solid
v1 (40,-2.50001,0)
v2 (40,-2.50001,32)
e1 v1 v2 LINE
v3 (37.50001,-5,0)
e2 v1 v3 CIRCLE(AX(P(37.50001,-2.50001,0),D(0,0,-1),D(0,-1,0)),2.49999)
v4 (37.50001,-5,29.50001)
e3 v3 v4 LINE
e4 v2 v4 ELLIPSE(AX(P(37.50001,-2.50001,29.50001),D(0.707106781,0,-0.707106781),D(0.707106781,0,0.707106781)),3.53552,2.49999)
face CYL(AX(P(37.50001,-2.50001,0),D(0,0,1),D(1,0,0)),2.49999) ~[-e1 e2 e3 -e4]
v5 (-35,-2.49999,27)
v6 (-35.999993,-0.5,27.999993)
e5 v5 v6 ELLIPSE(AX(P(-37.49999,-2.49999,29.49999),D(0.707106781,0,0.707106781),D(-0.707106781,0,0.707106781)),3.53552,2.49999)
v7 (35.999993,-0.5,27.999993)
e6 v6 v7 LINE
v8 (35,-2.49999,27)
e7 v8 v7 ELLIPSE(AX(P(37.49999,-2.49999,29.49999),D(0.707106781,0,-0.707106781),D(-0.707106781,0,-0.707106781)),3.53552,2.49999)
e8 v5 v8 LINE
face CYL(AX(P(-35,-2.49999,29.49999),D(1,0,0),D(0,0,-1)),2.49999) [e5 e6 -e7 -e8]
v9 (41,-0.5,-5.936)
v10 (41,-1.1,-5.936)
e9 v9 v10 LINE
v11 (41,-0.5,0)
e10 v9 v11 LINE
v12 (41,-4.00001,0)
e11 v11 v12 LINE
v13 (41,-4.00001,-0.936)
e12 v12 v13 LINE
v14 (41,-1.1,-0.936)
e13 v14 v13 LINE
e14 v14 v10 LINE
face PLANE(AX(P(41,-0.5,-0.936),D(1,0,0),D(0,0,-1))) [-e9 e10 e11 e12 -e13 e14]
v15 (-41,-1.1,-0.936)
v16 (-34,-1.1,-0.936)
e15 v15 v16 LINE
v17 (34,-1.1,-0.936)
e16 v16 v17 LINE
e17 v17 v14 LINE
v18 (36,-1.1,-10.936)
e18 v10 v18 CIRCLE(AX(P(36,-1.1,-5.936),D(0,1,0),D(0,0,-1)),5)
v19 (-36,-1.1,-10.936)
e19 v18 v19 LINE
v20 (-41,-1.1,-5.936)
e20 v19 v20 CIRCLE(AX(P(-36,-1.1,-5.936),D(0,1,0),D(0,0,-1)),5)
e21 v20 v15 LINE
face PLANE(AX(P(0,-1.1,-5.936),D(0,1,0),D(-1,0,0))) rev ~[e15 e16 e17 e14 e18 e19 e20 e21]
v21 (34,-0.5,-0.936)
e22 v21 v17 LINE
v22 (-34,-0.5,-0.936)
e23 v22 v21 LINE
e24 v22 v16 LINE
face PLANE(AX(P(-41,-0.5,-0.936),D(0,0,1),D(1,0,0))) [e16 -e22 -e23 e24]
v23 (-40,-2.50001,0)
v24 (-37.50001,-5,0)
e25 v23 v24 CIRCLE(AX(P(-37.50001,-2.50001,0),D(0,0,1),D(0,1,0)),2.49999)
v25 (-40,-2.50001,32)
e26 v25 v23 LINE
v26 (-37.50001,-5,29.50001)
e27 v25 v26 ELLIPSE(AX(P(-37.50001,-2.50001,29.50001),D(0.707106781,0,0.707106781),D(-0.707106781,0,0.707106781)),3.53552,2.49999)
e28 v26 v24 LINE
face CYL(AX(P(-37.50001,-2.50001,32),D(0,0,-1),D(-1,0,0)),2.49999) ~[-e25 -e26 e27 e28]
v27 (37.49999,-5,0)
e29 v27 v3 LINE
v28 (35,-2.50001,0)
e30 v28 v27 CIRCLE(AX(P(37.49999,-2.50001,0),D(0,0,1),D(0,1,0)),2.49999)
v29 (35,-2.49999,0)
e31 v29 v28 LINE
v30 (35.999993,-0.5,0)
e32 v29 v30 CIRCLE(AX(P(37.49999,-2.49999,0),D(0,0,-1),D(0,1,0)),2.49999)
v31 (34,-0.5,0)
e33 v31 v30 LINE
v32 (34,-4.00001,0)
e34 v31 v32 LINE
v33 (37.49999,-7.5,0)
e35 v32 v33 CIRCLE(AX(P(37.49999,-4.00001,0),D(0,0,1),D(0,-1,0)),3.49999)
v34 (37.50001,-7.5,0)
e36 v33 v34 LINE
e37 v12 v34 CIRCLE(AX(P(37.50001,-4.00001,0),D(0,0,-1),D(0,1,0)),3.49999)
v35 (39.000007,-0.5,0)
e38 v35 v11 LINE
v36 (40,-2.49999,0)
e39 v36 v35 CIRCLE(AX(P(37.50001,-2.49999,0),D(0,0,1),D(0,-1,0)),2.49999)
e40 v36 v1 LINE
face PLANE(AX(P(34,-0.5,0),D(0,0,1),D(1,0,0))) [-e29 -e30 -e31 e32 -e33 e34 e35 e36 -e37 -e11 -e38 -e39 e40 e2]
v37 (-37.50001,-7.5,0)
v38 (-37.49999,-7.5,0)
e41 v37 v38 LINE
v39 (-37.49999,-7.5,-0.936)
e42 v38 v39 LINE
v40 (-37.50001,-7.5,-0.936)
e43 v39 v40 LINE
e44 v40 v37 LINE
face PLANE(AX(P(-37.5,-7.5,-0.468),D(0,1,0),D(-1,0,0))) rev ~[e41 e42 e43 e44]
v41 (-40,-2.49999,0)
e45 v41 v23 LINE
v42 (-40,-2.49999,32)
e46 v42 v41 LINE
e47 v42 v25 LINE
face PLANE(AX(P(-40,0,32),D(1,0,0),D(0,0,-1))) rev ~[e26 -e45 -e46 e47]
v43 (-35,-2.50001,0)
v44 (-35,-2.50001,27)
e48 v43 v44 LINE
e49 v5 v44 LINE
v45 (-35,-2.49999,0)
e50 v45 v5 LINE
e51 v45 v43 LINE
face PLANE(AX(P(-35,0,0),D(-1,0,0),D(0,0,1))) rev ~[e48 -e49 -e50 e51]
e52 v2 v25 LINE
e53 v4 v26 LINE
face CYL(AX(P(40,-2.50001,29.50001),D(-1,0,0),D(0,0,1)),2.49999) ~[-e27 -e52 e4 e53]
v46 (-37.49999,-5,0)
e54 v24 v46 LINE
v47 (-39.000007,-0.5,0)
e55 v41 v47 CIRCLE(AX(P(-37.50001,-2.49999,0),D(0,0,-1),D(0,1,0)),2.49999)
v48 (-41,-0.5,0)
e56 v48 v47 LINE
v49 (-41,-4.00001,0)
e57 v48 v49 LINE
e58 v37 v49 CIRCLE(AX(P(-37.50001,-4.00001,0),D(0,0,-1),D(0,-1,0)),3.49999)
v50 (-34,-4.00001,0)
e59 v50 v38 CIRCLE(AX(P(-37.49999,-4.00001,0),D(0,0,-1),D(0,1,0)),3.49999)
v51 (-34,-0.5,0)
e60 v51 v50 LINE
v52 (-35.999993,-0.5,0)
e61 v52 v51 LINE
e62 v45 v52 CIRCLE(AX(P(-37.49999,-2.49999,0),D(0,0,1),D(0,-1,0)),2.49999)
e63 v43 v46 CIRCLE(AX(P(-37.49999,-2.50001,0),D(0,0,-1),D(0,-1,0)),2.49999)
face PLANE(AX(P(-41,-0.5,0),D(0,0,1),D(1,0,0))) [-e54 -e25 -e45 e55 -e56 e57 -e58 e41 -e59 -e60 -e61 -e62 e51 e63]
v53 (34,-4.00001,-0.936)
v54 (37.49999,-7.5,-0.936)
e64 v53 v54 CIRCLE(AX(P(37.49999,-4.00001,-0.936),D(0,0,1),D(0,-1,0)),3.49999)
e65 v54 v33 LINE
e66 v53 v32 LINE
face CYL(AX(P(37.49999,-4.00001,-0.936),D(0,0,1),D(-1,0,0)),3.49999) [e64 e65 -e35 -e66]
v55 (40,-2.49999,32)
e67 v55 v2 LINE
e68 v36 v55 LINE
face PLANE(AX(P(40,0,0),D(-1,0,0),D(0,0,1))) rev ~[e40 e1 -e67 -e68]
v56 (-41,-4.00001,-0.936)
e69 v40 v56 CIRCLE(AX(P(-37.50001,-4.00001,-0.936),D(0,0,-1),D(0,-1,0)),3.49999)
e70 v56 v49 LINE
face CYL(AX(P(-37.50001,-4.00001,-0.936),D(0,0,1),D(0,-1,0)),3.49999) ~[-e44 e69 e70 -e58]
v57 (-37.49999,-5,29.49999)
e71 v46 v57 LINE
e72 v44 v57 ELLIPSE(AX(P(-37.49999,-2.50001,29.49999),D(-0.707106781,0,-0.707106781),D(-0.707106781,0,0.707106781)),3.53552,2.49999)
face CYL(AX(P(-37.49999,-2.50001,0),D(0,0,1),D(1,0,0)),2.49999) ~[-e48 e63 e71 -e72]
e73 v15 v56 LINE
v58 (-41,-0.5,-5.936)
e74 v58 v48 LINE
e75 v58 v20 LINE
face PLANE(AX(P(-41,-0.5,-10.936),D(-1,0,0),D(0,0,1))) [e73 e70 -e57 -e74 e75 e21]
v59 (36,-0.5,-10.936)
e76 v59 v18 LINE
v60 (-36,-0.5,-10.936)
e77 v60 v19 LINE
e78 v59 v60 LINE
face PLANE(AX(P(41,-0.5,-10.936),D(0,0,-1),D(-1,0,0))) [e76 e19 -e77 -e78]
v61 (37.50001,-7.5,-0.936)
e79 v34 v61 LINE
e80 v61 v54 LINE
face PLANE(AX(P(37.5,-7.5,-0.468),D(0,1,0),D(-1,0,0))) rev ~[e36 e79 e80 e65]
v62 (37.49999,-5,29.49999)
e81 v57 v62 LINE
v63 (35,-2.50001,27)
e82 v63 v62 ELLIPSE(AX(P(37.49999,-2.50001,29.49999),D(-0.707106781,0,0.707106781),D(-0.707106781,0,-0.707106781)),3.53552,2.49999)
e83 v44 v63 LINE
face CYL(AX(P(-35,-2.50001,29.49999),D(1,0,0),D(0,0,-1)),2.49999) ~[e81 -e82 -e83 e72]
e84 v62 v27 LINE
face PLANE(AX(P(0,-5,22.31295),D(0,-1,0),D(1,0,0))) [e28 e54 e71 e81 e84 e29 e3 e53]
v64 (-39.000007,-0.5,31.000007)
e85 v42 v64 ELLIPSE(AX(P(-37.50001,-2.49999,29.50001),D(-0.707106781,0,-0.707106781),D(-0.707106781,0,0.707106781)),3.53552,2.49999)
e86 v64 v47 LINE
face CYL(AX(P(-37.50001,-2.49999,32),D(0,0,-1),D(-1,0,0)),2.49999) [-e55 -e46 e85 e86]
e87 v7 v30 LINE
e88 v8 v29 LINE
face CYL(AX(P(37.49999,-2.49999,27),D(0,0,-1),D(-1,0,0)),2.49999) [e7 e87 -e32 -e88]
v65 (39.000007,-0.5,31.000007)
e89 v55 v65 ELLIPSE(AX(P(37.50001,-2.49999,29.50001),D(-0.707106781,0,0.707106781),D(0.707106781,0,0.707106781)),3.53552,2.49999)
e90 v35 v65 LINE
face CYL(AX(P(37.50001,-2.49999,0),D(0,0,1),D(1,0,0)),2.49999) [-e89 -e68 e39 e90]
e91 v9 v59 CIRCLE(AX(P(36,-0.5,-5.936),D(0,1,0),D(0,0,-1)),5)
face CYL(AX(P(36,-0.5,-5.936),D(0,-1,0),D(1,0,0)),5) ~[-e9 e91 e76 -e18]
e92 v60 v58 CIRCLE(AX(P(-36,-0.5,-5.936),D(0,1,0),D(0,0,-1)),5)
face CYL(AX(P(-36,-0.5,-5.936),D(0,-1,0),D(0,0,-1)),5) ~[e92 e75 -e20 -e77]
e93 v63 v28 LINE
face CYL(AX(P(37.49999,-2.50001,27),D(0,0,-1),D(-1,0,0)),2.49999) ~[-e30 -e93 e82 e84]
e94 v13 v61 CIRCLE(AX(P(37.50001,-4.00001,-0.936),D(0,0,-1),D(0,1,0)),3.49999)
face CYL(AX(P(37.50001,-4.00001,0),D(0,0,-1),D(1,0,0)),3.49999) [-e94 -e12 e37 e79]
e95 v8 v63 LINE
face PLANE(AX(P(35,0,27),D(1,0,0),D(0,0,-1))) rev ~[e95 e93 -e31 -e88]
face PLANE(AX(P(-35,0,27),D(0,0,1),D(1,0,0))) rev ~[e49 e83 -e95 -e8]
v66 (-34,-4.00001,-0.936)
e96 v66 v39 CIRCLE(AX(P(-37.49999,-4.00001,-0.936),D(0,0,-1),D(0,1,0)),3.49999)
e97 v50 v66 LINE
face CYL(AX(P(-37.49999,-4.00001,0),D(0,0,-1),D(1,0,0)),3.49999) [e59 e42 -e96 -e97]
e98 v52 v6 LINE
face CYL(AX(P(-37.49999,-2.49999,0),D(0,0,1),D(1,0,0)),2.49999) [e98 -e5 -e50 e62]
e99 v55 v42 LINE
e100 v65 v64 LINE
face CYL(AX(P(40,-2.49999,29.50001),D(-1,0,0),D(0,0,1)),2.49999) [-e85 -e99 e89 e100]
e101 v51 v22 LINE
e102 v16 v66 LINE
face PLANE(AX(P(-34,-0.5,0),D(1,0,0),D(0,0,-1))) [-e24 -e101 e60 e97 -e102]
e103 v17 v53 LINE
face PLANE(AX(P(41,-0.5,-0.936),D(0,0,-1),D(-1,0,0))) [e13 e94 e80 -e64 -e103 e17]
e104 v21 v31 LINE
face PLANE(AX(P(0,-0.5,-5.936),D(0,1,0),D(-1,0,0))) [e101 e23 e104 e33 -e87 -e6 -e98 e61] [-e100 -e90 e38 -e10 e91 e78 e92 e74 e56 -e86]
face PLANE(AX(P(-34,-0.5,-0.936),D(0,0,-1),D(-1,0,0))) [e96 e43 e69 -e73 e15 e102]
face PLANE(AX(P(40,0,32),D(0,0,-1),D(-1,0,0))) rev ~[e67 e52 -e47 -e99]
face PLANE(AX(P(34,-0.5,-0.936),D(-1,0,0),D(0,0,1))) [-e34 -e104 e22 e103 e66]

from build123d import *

# Parameters (mm, degrees)
F2_DEPTH = 5
F3_R     = 2.49999
F4_W     = 80
F4_H     = 32
F5_DEPTH = 0.5
F7_DEPTH = 7
F8_DEPTH = 0.6
F9_R     = 3.49999
F10_R    = 5


# Not quite as in the source:
# - a fillet or chamfer is up to 0.001 mm smaller than in the source, because OpenCascade refuses the exact size


with BuildPart() as f2:
    # F1 (on Front) → F2 (new body)
    with BuildSketch(Plane.XZ):
        Polygon((-40, 32), (-40, 0), (-35, 0), (-35, 27), (35, 27), (35, 0), (40, 0), (40, 32), align=None)
    extrude(amount=F2_DEPTH)

    # F3 (radius 2.5 in the source; OpenCascade refuses exactly that, so slightly less here)
    f3_edges = [f2.edges().sort_by_distance(p)[0] for p in [
        (-35, -5, 13.5),
        (-35, 0, 13.5),
        (40, -5, 16),
        (40, 0, 16),
        (35, -5, 13.5),
        (35, 0, 13.5),
        (0, 0, 27),
        (0, 0, 32),
        (-40, 0, 16),
        (0, -5, 32),
        (-40, -5, 16),
        (0, -5, 27),
    ]]
    fillet(f3_edges, radius=F3_R)

    # F4 (on Front) → F5 (cut)
    with BuildSketch(Plane.XZ):
        with Locations((0, 16)):
            Rectangle(F4_W, F4_H)
    extrude(amount=F5_DEPTH, mode=Mode.SUBTRACT)

    # F6 (on face) → F7 (join)
    with BuildSketch(Plane(origin=(0, -0.5, 0), x_dir=(-1, 0, 0), z_dir=(0, 1, 0))):
        Polygon((-35.9999933333, 0), (-37.5, 0), (-39.0000066667, 0), (-41, 0), (-41, -0.936), (-34, -0.936), (-34, 0), align=None)
        Polygon((41, 0), (39.0000066667, 0), (37.5, 0), (35.9999933333, 0), (34, 0), (34, -0.936), (41, -0.936), align=None)
    extrude(amount=-F7_DEPTH)

    # F6 (on face) → F8 (join)
    with BuildSketch(Plane(origin=(0, -0.5, 0), x_dir=(-1, 0, 0), z_dir=(0, 1, 0))):
        Polygon((-34, -0.936), (-41, -0.936), (-41, -10.936), (0, -10.936), (41, -10.936), (41, -0.936), (34, -0.936), (0, -0.936), align=None)
    extrude(amount=-F8_DEPTH)

    # F9 (radius 3.5 in the source; OpenCascade refuses exactly that, so slightly less here)
    f9_edges = [f2.edges().sort_by_distance(p)[0] for p in [
        (41, -7.5, -0.468),
        (34, -7.5, -0.468),
        (-34, -7.5, -0.468),
        (-41, -7.5, -0.468),
    ]]
    fillet(f9_edges, radius=F9_R)

    # F10
    f10_edges = [f2.edges().sort_by_distance(p)[0] for p in [
        (41, -0.8, -10.936),
        (-41, -0.8, -10.936),
    ]]
    fillet(f10_edges, radius=F10_R)


solid = f2.part
